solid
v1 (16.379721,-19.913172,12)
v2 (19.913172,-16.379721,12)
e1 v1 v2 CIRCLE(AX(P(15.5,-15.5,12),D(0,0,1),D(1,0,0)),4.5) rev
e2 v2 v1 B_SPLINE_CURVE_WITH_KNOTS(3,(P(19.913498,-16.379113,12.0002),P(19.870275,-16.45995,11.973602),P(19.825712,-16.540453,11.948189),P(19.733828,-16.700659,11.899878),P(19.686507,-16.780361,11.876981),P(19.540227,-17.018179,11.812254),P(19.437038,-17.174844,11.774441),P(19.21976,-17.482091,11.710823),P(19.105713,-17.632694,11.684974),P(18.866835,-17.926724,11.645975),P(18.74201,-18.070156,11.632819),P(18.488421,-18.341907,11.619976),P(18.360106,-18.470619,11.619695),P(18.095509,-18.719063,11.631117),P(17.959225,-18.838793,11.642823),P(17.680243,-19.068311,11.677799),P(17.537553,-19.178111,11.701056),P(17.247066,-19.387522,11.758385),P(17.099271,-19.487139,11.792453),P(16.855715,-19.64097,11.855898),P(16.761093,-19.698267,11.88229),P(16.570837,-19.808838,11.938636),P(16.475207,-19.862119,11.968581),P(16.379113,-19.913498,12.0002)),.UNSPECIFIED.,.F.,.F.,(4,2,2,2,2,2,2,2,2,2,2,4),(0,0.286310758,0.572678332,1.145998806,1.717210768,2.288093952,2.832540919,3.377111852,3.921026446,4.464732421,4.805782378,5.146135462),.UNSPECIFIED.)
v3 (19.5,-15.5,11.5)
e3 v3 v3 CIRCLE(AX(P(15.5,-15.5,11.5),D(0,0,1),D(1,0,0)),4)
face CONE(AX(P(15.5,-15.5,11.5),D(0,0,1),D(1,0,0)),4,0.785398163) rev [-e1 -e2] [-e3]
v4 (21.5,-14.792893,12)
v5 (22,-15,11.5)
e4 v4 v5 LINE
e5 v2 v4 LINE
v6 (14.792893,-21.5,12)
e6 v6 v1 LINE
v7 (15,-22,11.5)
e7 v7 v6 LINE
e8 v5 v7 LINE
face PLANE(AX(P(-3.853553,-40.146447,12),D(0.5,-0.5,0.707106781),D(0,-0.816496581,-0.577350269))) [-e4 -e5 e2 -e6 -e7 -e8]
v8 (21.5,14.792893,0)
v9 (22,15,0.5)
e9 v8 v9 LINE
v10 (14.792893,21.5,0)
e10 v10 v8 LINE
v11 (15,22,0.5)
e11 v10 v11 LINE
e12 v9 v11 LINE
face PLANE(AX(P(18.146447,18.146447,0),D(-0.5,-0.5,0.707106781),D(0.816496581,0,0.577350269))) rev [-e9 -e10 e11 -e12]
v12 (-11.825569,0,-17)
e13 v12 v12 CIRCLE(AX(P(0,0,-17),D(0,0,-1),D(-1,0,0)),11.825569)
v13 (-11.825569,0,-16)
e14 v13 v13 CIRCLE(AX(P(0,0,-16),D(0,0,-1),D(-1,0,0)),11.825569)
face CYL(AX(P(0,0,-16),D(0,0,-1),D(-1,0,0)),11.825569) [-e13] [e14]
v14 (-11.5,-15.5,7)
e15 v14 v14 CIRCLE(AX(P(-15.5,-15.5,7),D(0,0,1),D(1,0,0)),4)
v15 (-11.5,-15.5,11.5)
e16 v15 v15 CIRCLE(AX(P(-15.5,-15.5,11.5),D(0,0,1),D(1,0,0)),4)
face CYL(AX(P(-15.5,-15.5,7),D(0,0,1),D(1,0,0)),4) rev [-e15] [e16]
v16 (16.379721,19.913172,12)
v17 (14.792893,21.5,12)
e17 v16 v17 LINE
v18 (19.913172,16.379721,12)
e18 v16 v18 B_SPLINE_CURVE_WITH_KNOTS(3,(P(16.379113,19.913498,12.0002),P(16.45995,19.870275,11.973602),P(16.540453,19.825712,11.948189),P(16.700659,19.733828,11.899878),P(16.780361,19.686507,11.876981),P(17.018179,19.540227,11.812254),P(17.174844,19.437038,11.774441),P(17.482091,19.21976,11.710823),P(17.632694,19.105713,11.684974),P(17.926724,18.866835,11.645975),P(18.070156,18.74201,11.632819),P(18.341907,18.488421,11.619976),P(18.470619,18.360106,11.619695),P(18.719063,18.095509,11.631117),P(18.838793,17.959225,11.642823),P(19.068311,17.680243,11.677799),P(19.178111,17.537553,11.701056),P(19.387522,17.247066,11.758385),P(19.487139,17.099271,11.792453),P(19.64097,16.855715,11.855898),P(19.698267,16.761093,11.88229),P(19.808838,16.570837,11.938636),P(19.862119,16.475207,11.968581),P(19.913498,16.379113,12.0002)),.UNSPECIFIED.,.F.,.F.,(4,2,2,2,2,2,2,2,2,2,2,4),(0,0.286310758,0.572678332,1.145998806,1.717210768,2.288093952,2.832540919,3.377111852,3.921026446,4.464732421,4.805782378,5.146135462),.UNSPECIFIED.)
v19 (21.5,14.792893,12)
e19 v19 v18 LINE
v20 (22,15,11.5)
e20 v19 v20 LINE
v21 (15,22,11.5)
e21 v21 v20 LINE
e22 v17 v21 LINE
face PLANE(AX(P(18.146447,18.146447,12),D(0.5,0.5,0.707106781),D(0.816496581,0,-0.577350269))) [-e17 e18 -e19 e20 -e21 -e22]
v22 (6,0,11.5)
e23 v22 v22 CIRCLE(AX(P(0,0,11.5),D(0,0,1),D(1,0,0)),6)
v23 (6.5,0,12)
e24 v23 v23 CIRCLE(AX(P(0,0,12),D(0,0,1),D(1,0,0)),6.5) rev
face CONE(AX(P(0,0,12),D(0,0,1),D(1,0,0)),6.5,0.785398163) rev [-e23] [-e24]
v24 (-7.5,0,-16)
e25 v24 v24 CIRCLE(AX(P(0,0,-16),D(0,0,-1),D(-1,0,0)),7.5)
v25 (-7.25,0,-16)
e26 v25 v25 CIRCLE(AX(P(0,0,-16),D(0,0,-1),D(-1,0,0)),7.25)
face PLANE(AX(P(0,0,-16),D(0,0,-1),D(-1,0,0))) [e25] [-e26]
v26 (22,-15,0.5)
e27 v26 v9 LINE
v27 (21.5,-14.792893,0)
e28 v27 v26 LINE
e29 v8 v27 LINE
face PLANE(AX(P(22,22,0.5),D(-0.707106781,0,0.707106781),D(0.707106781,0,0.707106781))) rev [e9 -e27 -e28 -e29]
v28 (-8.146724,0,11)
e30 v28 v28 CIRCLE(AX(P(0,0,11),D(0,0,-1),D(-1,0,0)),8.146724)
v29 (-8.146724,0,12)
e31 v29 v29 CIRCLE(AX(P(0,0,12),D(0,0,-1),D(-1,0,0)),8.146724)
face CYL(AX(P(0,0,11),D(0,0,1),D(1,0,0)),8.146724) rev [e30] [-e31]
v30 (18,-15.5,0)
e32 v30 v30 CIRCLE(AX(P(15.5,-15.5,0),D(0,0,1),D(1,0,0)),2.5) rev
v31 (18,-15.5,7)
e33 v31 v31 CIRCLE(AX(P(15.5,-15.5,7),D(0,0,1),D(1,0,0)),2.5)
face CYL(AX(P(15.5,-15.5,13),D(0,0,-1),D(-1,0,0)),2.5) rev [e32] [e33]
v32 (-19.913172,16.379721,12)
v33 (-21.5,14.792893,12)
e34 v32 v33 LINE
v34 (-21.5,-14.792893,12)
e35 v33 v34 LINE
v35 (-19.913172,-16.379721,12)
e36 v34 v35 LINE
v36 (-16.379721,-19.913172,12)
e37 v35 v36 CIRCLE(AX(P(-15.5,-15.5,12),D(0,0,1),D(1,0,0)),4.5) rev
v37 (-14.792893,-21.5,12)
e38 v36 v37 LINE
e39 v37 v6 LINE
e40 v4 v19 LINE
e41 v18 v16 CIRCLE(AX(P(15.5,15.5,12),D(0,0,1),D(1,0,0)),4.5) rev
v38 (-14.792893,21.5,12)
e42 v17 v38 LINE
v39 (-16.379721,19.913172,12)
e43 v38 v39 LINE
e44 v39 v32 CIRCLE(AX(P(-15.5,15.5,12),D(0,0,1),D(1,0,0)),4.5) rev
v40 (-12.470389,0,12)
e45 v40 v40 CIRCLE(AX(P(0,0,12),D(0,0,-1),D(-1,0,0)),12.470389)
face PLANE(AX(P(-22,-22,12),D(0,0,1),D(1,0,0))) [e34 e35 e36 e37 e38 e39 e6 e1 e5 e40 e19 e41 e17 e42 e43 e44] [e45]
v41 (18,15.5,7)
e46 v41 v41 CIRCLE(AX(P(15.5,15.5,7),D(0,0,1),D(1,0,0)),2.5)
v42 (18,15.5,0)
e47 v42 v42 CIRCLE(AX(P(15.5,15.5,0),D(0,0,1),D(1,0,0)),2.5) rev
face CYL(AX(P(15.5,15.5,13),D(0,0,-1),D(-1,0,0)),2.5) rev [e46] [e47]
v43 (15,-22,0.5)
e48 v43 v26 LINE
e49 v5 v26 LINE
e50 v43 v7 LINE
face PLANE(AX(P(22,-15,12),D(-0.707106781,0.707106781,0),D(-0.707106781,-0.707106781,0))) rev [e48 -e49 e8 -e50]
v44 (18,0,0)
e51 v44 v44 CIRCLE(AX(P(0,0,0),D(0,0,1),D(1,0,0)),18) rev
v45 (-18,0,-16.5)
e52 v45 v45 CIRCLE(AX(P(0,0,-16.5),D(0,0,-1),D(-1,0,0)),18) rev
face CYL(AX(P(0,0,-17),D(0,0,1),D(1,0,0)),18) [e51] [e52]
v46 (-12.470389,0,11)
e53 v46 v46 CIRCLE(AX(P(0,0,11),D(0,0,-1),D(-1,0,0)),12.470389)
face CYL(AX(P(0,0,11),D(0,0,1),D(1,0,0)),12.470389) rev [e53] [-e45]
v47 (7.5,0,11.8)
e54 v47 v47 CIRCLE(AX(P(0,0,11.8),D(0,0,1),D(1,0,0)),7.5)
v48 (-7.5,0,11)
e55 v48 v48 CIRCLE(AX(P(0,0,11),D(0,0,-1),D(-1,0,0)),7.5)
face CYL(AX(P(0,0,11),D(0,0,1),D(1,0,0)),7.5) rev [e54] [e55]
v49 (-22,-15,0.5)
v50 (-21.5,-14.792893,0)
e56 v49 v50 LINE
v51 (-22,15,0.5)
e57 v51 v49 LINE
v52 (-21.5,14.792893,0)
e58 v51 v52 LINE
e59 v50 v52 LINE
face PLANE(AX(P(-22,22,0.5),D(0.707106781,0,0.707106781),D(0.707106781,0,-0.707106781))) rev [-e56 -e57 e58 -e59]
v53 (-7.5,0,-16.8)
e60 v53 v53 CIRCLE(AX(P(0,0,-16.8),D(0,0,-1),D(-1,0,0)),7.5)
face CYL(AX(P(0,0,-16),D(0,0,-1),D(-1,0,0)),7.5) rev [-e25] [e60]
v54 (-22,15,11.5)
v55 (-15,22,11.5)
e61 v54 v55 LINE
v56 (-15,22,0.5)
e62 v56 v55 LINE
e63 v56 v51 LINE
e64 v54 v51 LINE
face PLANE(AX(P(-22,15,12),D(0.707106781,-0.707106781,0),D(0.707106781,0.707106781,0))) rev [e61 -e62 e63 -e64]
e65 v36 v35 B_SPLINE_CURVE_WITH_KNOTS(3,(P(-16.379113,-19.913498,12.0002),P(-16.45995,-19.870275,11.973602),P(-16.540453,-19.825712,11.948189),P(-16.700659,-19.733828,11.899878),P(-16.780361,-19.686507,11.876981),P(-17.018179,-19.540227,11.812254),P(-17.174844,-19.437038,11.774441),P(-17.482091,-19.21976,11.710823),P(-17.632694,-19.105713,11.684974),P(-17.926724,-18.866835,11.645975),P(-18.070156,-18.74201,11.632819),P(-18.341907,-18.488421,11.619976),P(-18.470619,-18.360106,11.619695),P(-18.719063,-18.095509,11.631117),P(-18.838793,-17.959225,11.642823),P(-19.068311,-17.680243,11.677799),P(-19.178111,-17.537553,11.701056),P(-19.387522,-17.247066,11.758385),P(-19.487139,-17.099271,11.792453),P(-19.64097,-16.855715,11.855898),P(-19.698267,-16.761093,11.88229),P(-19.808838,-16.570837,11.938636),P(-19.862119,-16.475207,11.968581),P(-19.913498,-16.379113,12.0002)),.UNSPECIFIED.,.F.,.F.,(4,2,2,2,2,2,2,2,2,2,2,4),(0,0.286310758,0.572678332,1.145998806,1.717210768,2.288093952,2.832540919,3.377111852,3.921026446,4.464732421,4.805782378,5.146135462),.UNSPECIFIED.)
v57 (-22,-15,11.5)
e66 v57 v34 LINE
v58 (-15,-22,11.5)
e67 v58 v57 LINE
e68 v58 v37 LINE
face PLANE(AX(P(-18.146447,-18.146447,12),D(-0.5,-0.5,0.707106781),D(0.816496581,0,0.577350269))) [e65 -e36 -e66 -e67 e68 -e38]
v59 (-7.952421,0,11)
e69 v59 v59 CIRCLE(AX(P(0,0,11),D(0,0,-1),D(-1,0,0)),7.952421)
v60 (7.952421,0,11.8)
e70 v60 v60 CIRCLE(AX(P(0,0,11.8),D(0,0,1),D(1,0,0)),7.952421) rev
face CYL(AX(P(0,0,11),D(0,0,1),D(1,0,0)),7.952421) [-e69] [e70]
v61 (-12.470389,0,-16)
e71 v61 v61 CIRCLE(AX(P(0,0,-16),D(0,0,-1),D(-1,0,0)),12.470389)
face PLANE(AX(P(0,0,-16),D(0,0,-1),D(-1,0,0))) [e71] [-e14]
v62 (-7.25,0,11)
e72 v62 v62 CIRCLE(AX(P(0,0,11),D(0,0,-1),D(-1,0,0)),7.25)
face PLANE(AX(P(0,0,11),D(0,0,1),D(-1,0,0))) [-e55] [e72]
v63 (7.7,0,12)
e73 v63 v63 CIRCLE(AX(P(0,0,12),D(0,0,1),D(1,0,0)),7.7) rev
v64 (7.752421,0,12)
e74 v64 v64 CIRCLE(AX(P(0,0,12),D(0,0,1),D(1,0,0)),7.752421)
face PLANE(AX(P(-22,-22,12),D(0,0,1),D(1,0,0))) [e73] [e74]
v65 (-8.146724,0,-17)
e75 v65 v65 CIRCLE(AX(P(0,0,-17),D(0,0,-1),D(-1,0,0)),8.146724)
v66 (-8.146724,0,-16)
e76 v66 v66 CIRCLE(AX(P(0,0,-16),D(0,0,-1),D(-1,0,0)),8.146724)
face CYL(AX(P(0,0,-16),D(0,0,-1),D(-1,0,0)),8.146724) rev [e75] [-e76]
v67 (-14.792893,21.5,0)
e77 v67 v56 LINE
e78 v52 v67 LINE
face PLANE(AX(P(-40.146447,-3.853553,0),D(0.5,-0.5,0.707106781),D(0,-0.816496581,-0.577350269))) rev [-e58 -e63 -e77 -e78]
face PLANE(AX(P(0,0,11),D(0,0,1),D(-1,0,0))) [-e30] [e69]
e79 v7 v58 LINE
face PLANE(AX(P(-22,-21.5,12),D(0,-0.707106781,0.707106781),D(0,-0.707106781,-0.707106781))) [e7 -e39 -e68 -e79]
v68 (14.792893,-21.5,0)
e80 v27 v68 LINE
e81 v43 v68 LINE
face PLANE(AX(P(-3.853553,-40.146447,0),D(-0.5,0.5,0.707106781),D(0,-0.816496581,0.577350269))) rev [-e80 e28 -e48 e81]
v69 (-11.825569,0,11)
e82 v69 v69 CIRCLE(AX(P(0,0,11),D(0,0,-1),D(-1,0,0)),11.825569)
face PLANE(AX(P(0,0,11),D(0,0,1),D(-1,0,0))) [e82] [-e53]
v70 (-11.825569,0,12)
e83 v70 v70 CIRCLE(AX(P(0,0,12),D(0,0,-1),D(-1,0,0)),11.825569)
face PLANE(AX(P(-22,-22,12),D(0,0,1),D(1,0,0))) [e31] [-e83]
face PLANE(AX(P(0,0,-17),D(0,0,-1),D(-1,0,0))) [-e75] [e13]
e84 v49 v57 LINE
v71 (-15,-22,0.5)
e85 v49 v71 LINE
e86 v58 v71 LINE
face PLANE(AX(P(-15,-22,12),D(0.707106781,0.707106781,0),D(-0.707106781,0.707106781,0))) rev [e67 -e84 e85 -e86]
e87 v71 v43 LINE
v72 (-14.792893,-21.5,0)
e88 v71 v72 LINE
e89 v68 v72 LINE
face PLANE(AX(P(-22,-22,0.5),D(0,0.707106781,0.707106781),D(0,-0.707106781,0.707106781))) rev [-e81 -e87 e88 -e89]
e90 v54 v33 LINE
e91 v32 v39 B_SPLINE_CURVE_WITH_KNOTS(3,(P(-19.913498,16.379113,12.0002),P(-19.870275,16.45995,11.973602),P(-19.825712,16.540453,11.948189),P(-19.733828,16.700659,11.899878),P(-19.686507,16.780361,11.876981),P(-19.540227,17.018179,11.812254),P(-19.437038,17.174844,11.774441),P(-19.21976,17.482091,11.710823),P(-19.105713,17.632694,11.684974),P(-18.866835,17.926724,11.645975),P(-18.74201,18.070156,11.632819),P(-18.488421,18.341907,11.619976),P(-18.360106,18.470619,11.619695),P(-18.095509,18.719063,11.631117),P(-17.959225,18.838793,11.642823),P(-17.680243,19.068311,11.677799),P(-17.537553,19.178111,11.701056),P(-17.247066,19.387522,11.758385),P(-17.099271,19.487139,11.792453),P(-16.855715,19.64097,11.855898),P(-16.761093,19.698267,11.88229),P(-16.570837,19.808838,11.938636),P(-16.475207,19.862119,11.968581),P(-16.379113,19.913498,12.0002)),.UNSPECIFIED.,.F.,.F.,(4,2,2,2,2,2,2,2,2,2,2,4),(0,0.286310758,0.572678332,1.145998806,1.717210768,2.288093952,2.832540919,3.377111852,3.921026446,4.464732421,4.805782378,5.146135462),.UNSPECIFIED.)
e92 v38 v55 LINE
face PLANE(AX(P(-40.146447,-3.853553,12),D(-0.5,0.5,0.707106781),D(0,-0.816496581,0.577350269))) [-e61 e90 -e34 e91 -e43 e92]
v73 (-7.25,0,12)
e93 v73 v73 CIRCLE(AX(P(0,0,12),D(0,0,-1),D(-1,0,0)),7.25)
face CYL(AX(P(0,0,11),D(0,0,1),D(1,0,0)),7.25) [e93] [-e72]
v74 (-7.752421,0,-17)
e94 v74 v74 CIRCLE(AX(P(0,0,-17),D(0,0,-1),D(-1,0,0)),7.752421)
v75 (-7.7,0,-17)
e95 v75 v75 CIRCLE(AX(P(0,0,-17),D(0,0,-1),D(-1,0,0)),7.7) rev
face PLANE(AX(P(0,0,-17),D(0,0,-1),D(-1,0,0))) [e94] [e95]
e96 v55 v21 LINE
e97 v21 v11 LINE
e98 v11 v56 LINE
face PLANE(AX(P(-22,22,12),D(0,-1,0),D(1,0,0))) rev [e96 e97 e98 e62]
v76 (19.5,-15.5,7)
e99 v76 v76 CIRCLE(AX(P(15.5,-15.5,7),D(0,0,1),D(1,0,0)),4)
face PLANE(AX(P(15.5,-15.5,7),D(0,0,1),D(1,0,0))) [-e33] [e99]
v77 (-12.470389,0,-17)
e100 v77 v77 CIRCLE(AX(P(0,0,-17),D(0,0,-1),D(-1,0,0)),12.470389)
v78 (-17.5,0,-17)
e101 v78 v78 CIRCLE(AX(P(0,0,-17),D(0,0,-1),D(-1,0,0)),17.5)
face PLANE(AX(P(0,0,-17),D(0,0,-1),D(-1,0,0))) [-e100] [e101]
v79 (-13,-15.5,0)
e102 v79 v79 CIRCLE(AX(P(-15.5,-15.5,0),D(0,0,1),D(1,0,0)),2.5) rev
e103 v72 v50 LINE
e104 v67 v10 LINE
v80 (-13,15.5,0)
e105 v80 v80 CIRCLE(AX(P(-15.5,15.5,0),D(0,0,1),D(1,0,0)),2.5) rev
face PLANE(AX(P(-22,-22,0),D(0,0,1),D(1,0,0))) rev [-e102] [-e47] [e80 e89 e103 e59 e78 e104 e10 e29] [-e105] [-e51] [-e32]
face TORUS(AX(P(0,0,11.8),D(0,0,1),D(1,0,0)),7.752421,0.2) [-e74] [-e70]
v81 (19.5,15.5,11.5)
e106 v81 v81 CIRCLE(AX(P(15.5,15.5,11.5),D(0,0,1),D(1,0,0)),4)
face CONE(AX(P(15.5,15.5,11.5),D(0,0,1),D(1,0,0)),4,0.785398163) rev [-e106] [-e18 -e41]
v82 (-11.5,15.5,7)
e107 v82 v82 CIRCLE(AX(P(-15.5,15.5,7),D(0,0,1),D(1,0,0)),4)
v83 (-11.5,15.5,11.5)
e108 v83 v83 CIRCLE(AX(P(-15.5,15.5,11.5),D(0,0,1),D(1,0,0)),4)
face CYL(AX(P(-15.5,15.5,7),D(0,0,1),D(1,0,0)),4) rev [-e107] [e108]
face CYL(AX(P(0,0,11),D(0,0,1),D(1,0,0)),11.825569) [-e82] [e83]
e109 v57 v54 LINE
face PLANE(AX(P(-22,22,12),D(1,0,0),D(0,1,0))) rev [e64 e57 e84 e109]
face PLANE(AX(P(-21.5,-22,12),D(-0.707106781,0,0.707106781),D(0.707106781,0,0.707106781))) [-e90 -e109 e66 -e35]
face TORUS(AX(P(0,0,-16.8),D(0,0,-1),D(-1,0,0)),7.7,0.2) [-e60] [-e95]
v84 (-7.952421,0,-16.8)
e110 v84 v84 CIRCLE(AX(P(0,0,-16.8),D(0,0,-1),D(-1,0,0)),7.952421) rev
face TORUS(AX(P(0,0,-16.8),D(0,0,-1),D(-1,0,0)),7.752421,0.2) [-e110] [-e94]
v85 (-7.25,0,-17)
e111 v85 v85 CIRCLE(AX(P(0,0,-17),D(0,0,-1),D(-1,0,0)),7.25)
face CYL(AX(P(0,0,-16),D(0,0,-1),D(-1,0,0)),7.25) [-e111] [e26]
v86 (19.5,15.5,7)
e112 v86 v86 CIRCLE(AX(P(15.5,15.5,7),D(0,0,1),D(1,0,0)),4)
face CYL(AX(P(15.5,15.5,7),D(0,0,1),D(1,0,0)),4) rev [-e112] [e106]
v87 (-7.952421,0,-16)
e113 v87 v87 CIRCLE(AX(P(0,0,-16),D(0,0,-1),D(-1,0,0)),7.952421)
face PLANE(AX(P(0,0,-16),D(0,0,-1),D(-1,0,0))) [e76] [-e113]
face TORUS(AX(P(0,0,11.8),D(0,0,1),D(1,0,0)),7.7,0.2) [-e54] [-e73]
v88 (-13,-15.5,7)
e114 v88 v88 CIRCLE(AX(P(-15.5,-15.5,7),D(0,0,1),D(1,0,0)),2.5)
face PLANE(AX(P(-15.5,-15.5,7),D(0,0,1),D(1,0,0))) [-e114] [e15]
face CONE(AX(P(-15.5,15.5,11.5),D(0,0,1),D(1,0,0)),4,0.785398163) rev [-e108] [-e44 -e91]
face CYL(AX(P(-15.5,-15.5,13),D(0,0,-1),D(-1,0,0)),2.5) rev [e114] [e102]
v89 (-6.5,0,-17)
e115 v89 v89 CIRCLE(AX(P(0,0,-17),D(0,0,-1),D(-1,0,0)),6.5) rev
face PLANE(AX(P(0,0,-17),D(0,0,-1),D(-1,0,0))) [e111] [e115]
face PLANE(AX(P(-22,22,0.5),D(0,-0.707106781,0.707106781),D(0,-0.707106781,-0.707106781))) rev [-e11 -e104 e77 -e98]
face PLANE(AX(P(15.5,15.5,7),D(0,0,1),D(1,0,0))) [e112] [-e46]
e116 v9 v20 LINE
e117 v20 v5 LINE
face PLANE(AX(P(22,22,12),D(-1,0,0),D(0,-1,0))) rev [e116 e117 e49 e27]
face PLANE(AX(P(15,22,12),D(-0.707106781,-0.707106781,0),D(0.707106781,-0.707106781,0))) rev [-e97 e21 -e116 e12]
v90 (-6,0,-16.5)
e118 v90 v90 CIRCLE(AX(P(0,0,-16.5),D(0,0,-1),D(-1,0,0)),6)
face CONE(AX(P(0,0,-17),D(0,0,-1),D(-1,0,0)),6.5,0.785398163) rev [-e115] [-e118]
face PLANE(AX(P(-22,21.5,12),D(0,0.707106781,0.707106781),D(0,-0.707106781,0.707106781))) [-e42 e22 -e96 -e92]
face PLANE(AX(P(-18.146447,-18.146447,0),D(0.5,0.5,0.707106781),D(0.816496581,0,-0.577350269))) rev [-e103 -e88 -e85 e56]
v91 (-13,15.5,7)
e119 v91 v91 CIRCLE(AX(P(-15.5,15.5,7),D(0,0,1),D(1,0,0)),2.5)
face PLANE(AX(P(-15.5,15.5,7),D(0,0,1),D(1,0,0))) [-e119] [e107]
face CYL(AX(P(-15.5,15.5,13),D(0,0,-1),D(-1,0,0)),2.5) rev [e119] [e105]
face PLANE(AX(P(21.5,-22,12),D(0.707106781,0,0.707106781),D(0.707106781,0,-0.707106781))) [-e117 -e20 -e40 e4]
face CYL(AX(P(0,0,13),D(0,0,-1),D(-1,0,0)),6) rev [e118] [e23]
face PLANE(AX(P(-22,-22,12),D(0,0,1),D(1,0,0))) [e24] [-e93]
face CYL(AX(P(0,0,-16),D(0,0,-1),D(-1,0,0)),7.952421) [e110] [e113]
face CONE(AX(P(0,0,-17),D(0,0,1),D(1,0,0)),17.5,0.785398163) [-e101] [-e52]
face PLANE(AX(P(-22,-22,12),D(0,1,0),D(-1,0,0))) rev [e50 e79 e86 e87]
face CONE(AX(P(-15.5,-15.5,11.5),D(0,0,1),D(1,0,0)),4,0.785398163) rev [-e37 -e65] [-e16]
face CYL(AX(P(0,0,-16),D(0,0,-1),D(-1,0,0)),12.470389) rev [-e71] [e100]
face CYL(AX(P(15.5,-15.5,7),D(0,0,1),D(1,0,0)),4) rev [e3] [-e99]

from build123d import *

# Parameters (mm, degrees)
ESBO_O1_W                  = 44
ESBO_O1_H                  = 44
RESSALTO_EXTRUS_O1_DEPTH   = 12
ESBO_O2_R                  = 18
RESSALTO_EXTRUS_O2_DEPTH   = 17
CHANFRO1_SIZE              = 7
CORTE_EXTRUS_O1_DEPTH      = 1
CORTE_EXTRUS_O1_DEPTH_BACK = 43.532340636
ESBO_O3_R                  = 6
ESBO_O3_R_2                = 2.5
ESBO_O4_R                  = 4
CORTE_EXTRUS_O2_DEPTH      = 5
CHANFRO2_SIZE              = 0.5
CHANFRO3_SIZE              = 0.5
ESBO_O5_R                  = 7.5
ESBO_O5_R_2                = 7.25
CORTE_EXTRUS_O3_DEPTH      = 1
ESBO_O6_R                  = 8.146724453
ESBO_O6_R_2                = 7.952420513
CORTE_EXTRUS_O4_DEPTH      = 1
ESBO_O7_R                  = 12.470388764
ESBO_O7_R_2                = 11.825568989
CORTE_EXTRUS_O5_DEPTH      = 1
FILETE1_R                  = 0.2
FILETE2_R                  = 0.2


with BuildPart() as part:
    # Esboço1 → Ressalto-extrusão1 (new body)
    with BuildSketch(Plane.XY):
        Rectangle(ESBO_O1_W, ESBO_O1_H)
    extrude(amount=RESSALTO_EXTRUS_O1_DEPTH)

    # Esboço2 → Ressalto-extrusão2 (add)
    with BuildSketch(Plane(origin=(0, 0, 0), x_dir=(-1, 0, 0), z_dir=(0, 0, -1))):
        with Locations(Location((0, 0, 0), (0, 0, 180))):
            Circle(ESBO_O2_R)
    extrude(amount=RESSALTO_EXTRUS_O2_DEPTH)

    # Chanfro1
    chanfro1_edges = [part.edges().sort_by_distance(p)[0] for p in [
        (-22, 22, 6),
        (22, 22, 6),
        (22, -22, 6),
        (-22, -22, 6),
    ]]
    chamfer(chanfro1_edges, length=CHANFRO1_SIZE)

    # Esboço3 → Corte-extrusão1 (cut, two sides: drawn at the far end of the back side and taken through both)
    with BuildSketch(Plane.XY.offset(12).offset(-CORTE_EXTRUS_O1_DEPTH_BACK)):
        Circle(ESBO_O3_R)
        with Locations((-15.5, 15.5)):
            Circle(ESBO_O3_R_2)
        with Locations((15.5, 15.5)):
            Circle(ESBO_O3_R_2)
        with Locations((15.5, -15.5)):
            Circle(ESBO_O3_R_2)
        with Locations((-15.5, -15.5)):
            Circle(ESBO_O3_R_2)
    extrude(amount=CORTE_EXTRUS_O1_DEPTH + CORTE_EXTRUS_O1_DEPTH_BACK, mode=Mode.SUBTRACT)

    # Esboço4 → Corte-extrusão2 (cut)
    with BuildSketch(Plane.XY.offset(12)):
        with Locations((-15.5, 15.5)):
            Circle(ESBO_O4_R)
        with Locations((15.5, 15.5)):
            Circle(ESBO_O4_R)
        with Locations((15.5, -15.5)):
            Circle(ESBO_O4_R)
        with Locations((-15.5, -15.5)):
            Circle(ESBO_O4_R)
    extrude(amount=-CORTE_EXTRUS_O2_DEPTH, mode=Mode.SUBTRACT)

    # Chanfro2
    # the kernel refuses this chamfer: 0.5 mm, written as the material it takes off along each edge
    with BuildSketch(Plane(origin=(0, 0, -17), x_dir=(1, 0, 0), z_dir=(0, 1, 0))) as chanfro2_piece_1:
        Polygon((18, -CHANFRO2_SIZE), (18 - CHANFRO2_SIZE, 0), (18, 0), align=None)
    revolve(axis=Axis((0, 0, -17), (0, 0, -1)), mode=Mode.SUBTRACT)
    with BuildSketch(Plane(origin=(16.285841494, -22, 12), x_dir=(0, 0.9996219169112968, 0.02749587661058555), z_dir=(-1, 0, 0)), Plane(origin=(-22, -16.285841494, 12), x_dir=(0.9996219169112968, 0, 0.02749587661058555), z_dir=(0, 1, 0)), Plane(origin=(22, 16.285841494, 12), x_dir=(-0.9996219169112968, 0, 0.02749587661058555), z_dir=(0, -1, 0))) as chanfro2_piece_2:
        Polygon((CHANFRO2_SIZE * 0.999621916911, CHANFRO2_SIZE * 0.0274958766106), (-CHANFRO2_SIZE * 0.0274958766106, CHANFRO2_SIZE * 0.999621916911), (0, 0), align=None)
    extrude(amount=32.571682988, mode=Mode.SUBTRACT)
    with BuildSketch(Plane(origin=(-16.285841494, 22, 12), x_dir=(0, 0.0274958766105891, -0.9996219169112968), z_dir=(1, 0, 0))) as chanfro2_piece_3:
        Polygon((CHANFRO2_SIZE * 0.999621916911, -CHANFRO2_SIZE * 0.0274958766106), (-CHANFRO2_SIZE * 0.0274958766106, -CHANFRO2_SIZE * 0.999621916911), (0, 0), align=None)
    extrude(amount=32.571682988, mode=Mode.SUBTRACT)
    with BuildSketch(Plane(origin=(-14.09077276, 22.90922724, 12), x_dir=(-0.019442520806015533, 0.019442520806015533, -0.9996219169112968), z_dir=(-0.7071067811865476, -0.7071067811865476, 0)), Plane(origin=(22.90922724, -14.09077276, 12), x_dir=(-0.7068394360706735, 0.7068394360706735, 0.02749587661058563), z_dir=(-0.7071067811865476, -0.7071067811865476, 0))) as chanfro2_piece_4:
        Polygon((CHANFRO2_SIZE * 0.999621916911, CHANFRO2_SIZE * 0.0274958766106), (-CHANFRO2_SIZE * 0.0274958766106, CHANFRO2_SIZE * 0.999621916911), (0, 0), align=None)
    extrude(amount=12.471177925, mode=Mode.SUBTRACT)
    with BuildSketch(Plane(origin=(14.09077276, 22.90922724, 12), x_dir=(0.019442520806015533, 0.019442520806015533, -0.9996219169112968), z_dir=(0.7071067811865476, -0.7071067811865476, 0)), Plane(origin=(-22.90922724, -14.09077276, 12), x_dir=(0.7068394360706735, 0.7068394360706735, 0.02749587661058563), z_dir=(0.7071067811865476, -0.7071067811865476, 0))) as chanfro2_piece_5:
        Polygon((CHANFRO2_SIZE * 0.999621916911, -CHANFRO2_SIZE * 0.0274958766106), (-CHANFRO2_SIZE * 0.0274958766106, -CHANFRO2_SIZE * 0.999621916911), (0, 0), align=None)
    extrude(amount=12.471177925, mode=Mode.SUBTRACT)
    with BuildSketch(Plane(origin=(0, 0, 12), x_dir=(1, 0, 0), z_dir=(0, -1, 0))) as chanfro2_piece_6:
        Polygon((6 + CHANFRO2_SIZE, 0), (6, -CHANFRO2_SIZE), (6, 0), align=None)
    revolve(axis=Axis((0, 0, 12), (0, 0, 1)), mode=Mode.SUBTRACT)
    with BuildSketch(Plane(origin=(0, 0, -17), x_dir=(1, 0, 0), z_dir=(0, -1, 0))) as chanfro2_piece_7:
        Polygon((6, CHANFRO2_SIZE), (6 + CHANFRO2_SIZE, 0), (6, 0), align=None)
    revolve(axis=Axis((0, 0, -17), (0, 0, 1)), mode=Mode.SUBTRACT)
    with BuildSketch(Plane(origin=(-15.5, 15.5, 12), x_dir=(1, 0, 0), z_dir=(0, -1, 0))) as chanfro2_piece_8:
        Polygon((4 + CHANFRO2_SIZE, 0), (4, -CHANFRO2_SIZE), (4, 0), align=None)
    revolve(axis=Axis((-15.5, 15.5, 12), (0, 0, 1)), mode=Mode.SUBTRACT)
    with BuildSketch(Plane(origin=(15.5, 15.5, 12), x_dir=(1, 0, 0), z_dir=(0, -1, 0))) as chanfro2_piece_9:
        Polygon((4 + CHANFRO2_SIZE, 0), (4, -CHANFRO2_SIZE), (4, 0), align=None)
    revolve(axis=Axis((15.5, 15.5, 12), (0, 0, 1)), mode=Mode.SUBTRACT)
    with BuildSketch(Plane(origin=(15.5, -15.5, 12), x_dir=(1, 0, 0), z_dir=(0, -1, 0))) as chanfro2_piece_10:
        Polygon((4 + CHANFRO2_SIZE, 0), (4, -CHANFRO2_SIZE), (4, 0), align=None)
    revolve(axis=Axis((15.5, -15.5, 12), (0, 0, 1)), mode=Mode.SUBTRACT)
    with BuildSketch(Plane(origin=(-15.5, -15.5, 12), x_dir=(1, 0, 0), z_dir=(0, -1, 0))) as chanfro2_piece_11:
        Polygon((4 + CHANFRO2_SIZE, 0), (4, -CHANFRO2_SIZE), (4, 0), align=None)
    revolve(axis=Axis((-15.5, -15.5, 12), (0, 0, 1)), mode=Mode.SUBTRACT)

    # Chanfro3
    chanfro3_edges = [part.edges().sort_by_distance(p)[0] for p in [
        (0, -22, 0),
        (-22, 0, 0),
        (0, 22, 0),
        (22, 0, 0),
        (-18.5, 18.5, 0),
        (18.5, 18.5, 0),
        (18.5, -18.5, 0),
        (-18.5, -18.5, 0),
    ]]
    chamfer(chanfro3_edges, length=CHANFRO3_SIZE)

    # Esboço5 → Corte-extrusão3 (cut)
    with BuildSketch(Plane(origin=(0, 0, -17), x_dir=(-1, 0, 0), z_dir=(0, 0, -1))):
        Circle(ESBO_O5_R)
        Circle(ESBO_O5_R_2, mode=Mode.SUBTRACT)
    corte_extrus_o3 = extrude(amount=-CORTE_EXTRUS_O3_DEPTH, mode=Mode.SUBTRACT)

    # Esboço6 → Corte-extrusão4 (cut)
    with BuildSketch(Plane(origin=(0, 0, -17), x_dir=(-1, 0, 0), z_dir=(0, 0, -1))):
        Circle(ESBO_O6_R)
        Circle(ESBO_O6_R_2, mode=Mode.SUBTRACT)
    corte_extrus_o4 = extrude(amount=-CORTE_EXTRUS_O4_DEPTH, mode=Mode.SUBTRACT)

    # Esboço7 → Corte-extrusão5 (cut)
    with BuildSketch(Plane(origin=(0, 0, -17), x_dir=(-1, 0, 0), z_dir=(0, 0, -1))):
        Circle(ESBO_O7_R)
        Circle(ESBO_O7_R_2, mode=Mode.SUBTRACT)
    corte_extrus_o5 = extrude(amount=-CORTE_EXTRUS_O5_DEPTH, mode=Mode.SUBTRACT)

    # Filete1
    filete1_edges = [part.edges().sort_by_distance(p)[0] for p in [
        (7.5, 0, -17),
        (7.952420513, 0, -17),
    ]]
    fillet(filete1_edges, radius=FILETE1_R)

    # Espelhar3: Corte-extrusão3, Corte-extrusão4, Corte-extrusão5 across plane
    add(corte_extrus_o3.mirror(Plane.XY.offset(-2.5)), mode=Mode.SUBTRACT)
    add(corte_extrus_o4.mirror(Plane.XY.offset(-2.5)), mode=Mode.SUBTRACT)
    add(corte_extrus_o5.mirror(Plane.XY.offset(-2.5)), mode=Mode.SUBTRACT)

    # Filete2
    filete2_edges = [part.edges().sort_by_distance(p)[0] for p in [
        (7.5, 0, 12),
        (7.952420513, 0, 12),
    ]]
    fillet(filete2_edges, radius=FILETE2_R)


solid = part.part
